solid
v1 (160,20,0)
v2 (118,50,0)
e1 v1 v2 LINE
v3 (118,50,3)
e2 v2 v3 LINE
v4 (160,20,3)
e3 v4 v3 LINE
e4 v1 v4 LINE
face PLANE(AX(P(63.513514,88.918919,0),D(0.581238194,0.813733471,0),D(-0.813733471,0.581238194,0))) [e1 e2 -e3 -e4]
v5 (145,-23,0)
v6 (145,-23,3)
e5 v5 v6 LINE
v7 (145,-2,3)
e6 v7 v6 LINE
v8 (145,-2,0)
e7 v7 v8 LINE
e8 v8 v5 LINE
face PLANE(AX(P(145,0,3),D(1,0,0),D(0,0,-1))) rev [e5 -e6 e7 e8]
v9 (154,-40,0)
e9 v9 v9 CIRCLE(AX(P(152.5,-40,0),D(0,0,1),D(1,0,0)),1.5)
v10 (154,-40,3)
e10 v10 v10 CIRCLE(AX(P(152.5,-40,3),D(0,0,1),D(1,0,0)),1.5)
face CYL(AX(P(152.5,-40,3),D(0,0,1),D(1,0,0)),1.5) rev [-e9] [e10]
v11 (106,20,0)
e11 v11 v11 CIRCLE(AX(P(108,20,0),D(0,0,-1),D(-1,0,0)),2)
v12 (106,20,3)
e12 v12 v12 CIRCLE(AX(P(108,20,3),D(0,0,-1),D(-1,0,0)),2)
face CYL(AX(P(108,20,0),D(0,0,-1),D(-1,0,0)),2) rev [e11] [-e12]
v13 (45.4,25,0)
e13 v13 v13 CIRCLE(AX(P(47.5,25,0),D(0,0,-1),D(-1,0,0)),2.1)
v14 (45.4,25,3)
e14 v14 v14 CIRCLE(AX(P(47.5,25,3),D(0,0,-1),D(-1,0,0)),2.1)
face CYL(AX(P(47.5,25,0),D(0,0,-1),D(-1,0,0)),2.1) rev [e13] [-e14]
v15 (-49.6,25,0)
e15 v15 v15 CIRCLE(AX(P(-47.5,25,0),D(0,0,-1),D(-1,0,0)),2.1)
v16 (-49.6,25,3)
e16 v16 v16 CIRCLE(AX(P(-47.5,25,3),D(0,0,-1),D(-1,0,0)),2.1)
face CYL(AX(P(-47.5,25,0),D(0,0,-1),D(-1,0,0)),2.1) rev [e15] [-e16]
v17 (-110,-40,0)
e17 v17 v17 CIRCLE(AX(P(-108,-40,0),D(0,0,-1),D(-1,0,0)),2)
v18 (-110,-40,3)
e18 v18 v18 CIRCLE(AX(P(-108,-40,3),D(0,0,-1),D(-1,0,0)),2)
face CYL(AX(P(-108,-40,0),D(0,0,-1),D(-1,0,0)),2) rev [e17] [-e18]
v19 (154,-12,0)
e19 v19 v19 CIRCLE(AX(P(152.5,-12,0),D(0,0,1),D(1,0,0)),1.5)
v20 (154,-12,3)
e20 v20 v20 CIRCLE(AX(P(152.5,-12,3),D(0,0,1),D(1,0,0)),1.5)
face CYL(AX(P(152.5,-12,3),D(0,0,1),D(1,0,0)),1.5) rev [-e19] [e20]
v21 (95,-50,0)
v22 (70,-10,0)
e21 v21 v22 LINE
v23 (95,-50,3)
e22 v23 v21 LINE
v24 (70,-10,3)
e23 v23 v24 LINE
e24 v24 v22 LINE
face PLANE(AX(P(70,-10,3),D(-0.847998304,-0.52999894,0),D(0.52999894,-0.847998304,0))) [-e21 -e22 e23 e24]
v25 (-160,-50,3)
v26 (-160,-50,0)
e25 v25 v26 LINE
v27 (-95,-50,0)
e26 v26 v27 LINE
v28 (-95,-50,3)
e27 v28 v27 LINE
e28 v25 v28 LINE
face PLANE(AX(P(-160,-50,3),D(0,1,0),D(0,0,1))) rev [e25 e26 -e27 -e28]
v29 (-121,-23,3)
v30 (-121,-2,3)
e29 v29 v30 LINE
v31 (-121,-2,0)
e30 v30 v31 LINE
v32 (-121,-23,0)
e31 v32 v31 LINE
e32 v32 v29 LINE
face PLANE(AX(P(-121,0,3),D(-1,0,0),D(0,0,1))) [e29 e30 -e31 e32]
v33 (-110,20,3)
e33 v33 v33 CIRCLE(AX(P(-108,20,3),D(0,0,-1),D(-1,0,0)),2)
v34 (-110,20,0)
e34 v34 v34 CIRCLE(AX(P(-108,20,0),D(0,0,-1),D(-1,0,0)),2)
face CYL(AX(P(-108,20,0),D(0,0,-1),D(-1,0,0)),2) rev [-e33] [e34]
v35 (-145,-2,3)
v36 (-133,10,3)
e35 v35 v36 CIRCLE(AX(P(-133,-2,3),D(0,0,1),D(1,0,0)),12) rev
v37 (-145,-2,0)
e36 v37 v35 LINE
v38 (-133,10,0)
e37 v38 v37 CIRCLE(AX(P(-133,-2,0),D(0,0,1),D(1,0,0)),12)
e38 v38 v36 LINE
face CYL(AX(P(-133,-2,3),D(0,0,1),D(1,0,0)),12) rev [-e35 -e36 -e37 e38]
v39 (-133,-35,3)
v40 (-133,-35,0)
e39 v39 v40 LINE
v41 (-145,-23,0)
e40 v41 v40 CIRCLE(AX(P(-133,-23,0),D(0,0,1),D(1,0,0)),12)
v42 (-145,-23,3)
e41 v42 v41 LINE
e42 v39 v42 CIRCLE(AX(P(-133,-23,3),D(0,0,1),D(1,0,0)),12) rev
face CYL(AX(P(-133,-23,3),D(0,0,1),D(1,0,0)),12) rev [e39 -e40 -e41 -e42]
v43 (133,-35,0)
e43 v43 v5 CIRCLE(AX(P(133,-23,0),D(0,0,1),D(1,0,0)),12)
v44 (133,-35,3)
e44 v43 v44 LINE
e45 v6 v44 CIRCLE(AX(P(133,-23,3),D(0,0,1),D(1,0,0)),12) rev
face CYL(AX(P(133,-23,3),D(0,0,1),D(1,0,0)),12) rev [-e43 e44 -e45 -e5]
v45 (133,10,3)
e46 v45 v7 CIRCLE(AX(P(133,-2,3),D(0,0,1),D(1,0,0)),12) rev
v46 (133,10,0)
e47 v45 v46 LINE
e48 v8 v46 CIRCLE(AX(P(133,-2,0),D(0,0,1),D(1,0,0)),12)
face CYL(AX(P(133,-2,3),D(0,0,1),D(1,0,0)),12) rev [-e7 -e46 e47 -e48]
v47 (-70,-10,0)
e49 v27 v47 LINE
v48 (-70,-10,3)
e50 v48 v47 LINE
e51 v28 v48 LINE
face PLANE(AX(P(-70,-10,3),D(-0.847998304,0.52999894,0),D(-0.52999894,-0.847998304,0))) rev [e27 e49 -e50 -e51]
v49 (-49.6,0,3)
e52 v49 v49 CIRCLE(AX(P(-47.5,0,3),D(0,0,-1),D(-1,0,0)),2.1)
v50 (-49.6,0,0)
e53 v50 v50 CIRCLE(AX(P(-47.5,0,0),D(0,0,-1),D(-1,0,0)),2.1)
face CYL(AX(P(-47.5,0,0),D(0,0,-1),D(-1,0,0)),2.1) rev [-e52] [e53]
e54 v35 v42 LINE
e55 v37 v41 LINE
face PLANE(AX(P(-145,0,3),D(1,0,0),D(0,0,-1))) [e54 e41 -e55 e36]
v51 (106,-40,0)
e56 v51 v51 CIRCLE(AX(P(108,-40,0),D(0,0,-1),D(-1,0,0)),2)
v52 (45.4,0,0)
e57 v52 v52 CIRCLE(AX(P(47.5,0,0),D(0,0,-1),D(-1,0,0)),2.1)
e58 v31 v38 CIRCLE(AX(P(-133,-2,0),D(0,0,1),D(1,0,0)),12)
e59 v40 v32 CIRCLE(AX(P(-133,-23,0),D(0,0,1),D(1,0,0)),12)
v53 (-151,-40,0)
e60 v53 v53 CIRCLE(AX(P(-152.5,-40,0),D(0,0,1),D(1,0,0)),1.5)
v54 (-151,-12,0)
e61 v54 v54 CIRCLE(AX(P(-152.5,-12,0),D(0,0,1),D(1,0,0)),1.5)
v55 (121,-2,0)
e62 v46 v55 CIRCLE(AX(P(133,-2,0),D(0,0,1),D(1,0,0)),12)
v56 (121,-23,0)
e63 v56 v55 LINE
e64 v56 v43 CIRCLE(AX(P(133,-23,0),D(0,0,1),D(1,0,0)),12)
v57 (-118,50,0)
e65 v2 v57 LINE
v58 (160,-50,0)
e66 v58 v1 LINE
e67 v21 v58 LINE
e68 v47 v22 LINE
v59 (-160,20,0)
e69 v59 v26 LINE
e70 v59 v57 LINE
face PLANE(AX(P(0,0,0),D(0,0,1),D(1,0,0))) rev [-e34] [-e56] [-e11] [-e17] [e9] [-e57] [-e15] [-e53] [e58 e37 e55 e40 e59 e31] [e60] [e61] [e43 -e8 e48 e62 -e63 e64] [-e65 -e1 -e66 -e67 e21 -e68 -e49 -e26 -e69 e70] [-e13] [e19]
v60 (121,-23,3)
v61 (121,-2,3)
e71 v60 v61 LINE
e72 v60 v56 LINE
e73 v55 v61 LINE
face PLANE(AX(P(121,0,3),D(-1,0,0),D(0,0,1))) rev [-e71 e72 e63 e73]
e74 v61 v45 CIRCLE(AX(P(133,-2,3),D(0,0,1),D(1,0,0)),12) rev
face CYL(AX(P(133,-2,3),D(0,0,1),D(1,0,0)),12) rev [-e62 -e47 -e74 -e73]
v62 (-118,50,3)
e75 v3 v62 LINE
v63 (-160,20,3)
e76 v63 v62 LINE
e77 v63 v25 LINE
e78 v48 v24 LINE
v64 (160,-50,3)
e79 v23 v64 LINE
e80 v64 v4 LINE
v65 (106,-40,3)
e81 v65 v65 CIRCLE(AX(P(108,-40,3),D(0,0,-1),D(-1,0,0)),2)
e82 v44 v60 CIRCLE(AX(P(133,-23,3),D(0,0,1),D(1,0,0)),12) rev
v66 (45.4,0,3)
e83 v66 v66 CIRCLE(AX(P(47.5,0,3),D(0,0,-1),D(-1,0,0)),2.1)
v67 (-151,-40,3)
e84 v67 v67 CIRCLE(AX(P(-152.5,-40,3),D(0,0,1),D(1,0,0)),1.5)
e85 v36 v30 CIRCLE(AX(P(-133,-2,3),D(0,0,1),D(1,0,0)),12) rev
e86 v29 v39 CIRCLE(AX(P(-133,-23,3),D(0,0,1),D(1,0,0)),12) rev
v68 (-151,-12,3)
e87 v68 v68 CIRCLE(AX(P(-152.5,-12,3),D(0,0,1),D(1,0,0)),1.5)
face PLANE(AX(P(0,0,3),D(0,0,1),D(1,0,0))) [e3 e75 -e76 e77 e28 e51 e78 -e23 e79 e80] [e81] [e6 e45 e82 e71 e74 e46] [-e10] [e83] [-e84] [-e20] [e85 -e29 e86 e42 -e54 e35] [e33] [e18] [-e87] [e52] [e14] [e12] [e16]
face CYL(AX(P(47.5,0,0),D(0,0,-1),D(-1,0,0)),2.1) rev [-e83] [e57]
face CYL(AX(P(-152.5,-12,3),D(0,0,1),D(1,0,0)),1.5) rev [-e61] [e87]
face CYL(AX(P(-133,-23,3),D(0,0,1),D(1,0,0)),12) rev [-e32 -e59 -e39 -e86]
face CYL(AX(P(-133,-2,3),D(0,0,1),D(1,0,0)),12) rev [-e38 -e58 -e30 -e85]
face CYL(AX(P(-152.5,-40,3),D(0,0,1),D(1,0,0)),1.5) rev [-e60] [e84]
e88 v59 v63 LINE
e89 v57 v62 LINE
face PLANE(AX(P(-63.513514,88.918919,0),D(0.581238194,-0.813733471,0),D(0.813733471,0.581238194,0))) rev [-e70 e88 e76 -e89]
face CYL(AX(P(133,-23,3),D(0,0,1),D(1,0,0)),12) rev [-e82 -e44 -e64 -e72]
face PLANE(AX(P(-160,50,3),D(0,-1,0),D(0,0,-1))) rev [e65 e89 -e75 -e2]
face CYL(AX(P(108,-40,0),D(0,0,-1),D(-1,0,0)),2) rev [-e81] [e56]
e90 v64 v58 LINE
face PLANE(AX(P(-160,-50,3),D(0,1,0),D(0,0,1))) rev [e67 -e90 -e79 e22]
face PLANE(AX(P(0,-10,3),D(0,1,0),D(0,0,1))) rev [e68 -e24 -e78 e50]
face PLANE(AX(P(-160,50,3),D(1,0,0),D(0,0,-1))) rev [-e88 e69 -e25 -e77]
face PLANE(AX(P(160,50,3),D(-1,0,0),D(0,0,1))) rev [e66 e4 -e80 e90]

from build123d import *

# Parameters (mm, degrees)
SKETCH_1_W                  = 320
SKETCH_1_H                  = 100
EXTRUDE_1_DEPTH             = 3
HOLE_WIZARD_4_0_4_1_D       = 4
HOLE_WIZARD_4_2_4_2_1_D     = 4.2
PATTERN_LINEAR_1_COUNT      = 2
PATTERN_LINEAR_1_PITCH      = 95
PATTERN_LINEAR_1_COUNT_DIR2 = 2
PATTERN_LINEAR_1_PITCH_DIR2 = 25
CUT_EXTRUDE_1_DEPTH         = 3
SKETCH_8_W                  = 24
SKETCH_8_H                  = 45
CUT_EXTRUDE_6_DEPTH         = 3
PATTERN_LINEAR_2_COUNT      = 2
PATTERN_LINEAR_2_PITCH      = 60
PATTERN_LINEAR_2_COPY_1_D   = 4
HOLE_WIZARD_3_0_3_1_D       = 3
CUT_EXTRUDE_8_DEPTH         = 3
FILLET_1_R                  = 12


with BuildPart() as part:
    # 草图1 → 凸台-拉伸1 (new body)
    with BuildSketch(Plane.XY):
        Rectangle(SKETCH_1_W, SKETCH_1_H)
    extrude(amount=EXTRUDE_1_DEPTH)

    # Ø4.0 (4) 直径孔1 (through all)
    with Locations(Plane(origin=(0, 0, 0), x_dir=(-1, 0, 0), z_dir=(0, 0, -1))):
        with Locations((108, -40)):
            hole_wizard_4_0_4_1 = Hole(HOLE_WIZARD_4_0_4_1_D / 2)

    # 镜向1: Ø4.0 (4) 直径孔1 across plane
    add(hole_wizard_4_0_4_1.mirror(Plane(origin=(0, 0, 0), x_dir=(0, 0, 1), z_dir=(1, 0, 0))), mode=Mode.SUBTRACT)

    # Ø4.2 (4.2) 直径孔1 (through all)
    with Locations(Plane(origin=(0, 0, 0), x_dir=(-1, 0, 0), z_dir=(0, 0, -1))):
        with Locations((47.5, 0)):
            hole_wizard_4_2_4_2_1 = Hole(HOLE_WIZARD_4_2_4_2_1_D / 2)

    # 阵列(线性)1: Hole Wizard 4.2 _4.2_ _1 2 × 2
    with Locations(*[(i * PATTERN_LINEAR_1_PITCH, j * PATTERN_LINEAR_1_PITCH_DIR2, 0) for i in range(PATTERN_LINEAR_1_COUNT) for j in range(PATTERN_LINEAR_1_COUNT_DIR2) if (i, j) != (0, 0)]):
        add(hole_wizard_4_2_4_2_1, mode=Mode.SUBTRACT)

    # 草图6 → 切除-拉伸1 (cut)
    with BuildSketch(Plane(origin=(0, 0, 0), x_dir=(-1, 0, 0), z_dir=(0, 0, -1))):
        Polygon((0, -50), (0, -10), (70, -10), (95, -50), align=None)
    cut_extrude_1 = extrude(amount=-CUT_EXTRUDE_1_DEPTH, mode=Mode.SUBTRACT)

    # 镜向2: 切除-拉伸1 across plane
    add(cut_extrude_1.mirror(Plane(origin=(0, -50, 3), x_dir=(0, 0, 1), z_dir=(1, 0, 0))), mode=Mode.SUBTRACT)

    # 草图8 → 切除-拉伸6 (cut)
    with BuildSketch(Plane(origin=(0, 0, 0), x_dir=(-1, 0, 0), z_dir=(0, 0, -1))):
        with Locations((-133, -12.5)):
            Rectangle(SKETCH_8_W, SKETCH_8_H)
    cut_extrude_6 = extrude(amount=-CUT_EXTRUDE_6_DEPTH, mode=Mode.SUBTRACT)

    # 镜向4: 切除-拉伸6 across plane
    add(cut_extrude_6.mirror(Plane(origin=(0, 0, 0), x_dir=(0, 0, 1), z_dir=(1, 0, 0))), mode=Mode.SUBTRACT)

    # 阵列(线性)2: Ø4.0 (4) 直径孔1 ×2
    with Locations(*[(0, i * PATTERN_LINEAR_2_PITCH, 0) for i in range(1, PATTERN_LINEAR_2_COUNT)]):
        add(hole_wizard_4_0_4_1, mode=Mode.SUBTRACT)

    # 阵列(线性)2 copy 1 (through all)
    with Locations(Plane(origin=(0, 60, 0), x_dir=(1, 0, 0), z_dir=(0, 0, -1))):
        with Locations((108, 40)):
            Hole(PATTERN_LINEAR_2_COPY_1_D / 2)

    # Ø3.0 (3) 直径孔1 (through all)
    with Locations(Plane.XY.offset(3)):
        with Locations((-152.5, -40), (-152.5, -12)):
            hole_wizard_3_0_3_1 = Hole(HOLE_WIZARD_3_0_3_1_D / 2)

    # 草图11 → 切除-拉伸8 (cut)
    with BuildSketch(Plane.XY.offset(3)):
        Polygon((-118, 50), (-160, 50), (-160, 20), align=None)
    cut_extrude_8 = extrude(amount=-CUT_EXTRUDE_8_DEPTH, mode=Mode.SUBTRACT)

    # 镜向6: 切除-拉伸8 across plane
    add(cut_extrude_8.mirror(Plane(origin=(0, 0, 0), x_dir=(0, 0, 1), z_dir=(1, 0, 0))), mode=Mode.SUBTRACT)

    # 镜向7: Ø3.0 (3) 直径孔1 across plane
    add(hole_wizard_3_0_3_1.mirror(Plane(origin=(0, 0, 0), x_dir=(0, 0, 1), z_dir=(1, 0, 0))), mode=Mode.SUBTRACT)

    # 圆角1
    fillet_1_edges = [part.edges().sort_by_distance(p)[0] for p in [
        (145, -35, 1.5),
        (121, -35, 1.5),
        (145, 10, 1.5),
        (121, 10, 1.5),
        (-145, -35, 1.5),
        (-121, -35, 1.5),
        (-145, 10, 1.5),
        (-121, 10, 1.5),
    ]]
    fillet(fillet_1_edges, radius=FILLET_1_R - 0.0001)  # a hair under: the kernel refuses the full size


solid = part.part
